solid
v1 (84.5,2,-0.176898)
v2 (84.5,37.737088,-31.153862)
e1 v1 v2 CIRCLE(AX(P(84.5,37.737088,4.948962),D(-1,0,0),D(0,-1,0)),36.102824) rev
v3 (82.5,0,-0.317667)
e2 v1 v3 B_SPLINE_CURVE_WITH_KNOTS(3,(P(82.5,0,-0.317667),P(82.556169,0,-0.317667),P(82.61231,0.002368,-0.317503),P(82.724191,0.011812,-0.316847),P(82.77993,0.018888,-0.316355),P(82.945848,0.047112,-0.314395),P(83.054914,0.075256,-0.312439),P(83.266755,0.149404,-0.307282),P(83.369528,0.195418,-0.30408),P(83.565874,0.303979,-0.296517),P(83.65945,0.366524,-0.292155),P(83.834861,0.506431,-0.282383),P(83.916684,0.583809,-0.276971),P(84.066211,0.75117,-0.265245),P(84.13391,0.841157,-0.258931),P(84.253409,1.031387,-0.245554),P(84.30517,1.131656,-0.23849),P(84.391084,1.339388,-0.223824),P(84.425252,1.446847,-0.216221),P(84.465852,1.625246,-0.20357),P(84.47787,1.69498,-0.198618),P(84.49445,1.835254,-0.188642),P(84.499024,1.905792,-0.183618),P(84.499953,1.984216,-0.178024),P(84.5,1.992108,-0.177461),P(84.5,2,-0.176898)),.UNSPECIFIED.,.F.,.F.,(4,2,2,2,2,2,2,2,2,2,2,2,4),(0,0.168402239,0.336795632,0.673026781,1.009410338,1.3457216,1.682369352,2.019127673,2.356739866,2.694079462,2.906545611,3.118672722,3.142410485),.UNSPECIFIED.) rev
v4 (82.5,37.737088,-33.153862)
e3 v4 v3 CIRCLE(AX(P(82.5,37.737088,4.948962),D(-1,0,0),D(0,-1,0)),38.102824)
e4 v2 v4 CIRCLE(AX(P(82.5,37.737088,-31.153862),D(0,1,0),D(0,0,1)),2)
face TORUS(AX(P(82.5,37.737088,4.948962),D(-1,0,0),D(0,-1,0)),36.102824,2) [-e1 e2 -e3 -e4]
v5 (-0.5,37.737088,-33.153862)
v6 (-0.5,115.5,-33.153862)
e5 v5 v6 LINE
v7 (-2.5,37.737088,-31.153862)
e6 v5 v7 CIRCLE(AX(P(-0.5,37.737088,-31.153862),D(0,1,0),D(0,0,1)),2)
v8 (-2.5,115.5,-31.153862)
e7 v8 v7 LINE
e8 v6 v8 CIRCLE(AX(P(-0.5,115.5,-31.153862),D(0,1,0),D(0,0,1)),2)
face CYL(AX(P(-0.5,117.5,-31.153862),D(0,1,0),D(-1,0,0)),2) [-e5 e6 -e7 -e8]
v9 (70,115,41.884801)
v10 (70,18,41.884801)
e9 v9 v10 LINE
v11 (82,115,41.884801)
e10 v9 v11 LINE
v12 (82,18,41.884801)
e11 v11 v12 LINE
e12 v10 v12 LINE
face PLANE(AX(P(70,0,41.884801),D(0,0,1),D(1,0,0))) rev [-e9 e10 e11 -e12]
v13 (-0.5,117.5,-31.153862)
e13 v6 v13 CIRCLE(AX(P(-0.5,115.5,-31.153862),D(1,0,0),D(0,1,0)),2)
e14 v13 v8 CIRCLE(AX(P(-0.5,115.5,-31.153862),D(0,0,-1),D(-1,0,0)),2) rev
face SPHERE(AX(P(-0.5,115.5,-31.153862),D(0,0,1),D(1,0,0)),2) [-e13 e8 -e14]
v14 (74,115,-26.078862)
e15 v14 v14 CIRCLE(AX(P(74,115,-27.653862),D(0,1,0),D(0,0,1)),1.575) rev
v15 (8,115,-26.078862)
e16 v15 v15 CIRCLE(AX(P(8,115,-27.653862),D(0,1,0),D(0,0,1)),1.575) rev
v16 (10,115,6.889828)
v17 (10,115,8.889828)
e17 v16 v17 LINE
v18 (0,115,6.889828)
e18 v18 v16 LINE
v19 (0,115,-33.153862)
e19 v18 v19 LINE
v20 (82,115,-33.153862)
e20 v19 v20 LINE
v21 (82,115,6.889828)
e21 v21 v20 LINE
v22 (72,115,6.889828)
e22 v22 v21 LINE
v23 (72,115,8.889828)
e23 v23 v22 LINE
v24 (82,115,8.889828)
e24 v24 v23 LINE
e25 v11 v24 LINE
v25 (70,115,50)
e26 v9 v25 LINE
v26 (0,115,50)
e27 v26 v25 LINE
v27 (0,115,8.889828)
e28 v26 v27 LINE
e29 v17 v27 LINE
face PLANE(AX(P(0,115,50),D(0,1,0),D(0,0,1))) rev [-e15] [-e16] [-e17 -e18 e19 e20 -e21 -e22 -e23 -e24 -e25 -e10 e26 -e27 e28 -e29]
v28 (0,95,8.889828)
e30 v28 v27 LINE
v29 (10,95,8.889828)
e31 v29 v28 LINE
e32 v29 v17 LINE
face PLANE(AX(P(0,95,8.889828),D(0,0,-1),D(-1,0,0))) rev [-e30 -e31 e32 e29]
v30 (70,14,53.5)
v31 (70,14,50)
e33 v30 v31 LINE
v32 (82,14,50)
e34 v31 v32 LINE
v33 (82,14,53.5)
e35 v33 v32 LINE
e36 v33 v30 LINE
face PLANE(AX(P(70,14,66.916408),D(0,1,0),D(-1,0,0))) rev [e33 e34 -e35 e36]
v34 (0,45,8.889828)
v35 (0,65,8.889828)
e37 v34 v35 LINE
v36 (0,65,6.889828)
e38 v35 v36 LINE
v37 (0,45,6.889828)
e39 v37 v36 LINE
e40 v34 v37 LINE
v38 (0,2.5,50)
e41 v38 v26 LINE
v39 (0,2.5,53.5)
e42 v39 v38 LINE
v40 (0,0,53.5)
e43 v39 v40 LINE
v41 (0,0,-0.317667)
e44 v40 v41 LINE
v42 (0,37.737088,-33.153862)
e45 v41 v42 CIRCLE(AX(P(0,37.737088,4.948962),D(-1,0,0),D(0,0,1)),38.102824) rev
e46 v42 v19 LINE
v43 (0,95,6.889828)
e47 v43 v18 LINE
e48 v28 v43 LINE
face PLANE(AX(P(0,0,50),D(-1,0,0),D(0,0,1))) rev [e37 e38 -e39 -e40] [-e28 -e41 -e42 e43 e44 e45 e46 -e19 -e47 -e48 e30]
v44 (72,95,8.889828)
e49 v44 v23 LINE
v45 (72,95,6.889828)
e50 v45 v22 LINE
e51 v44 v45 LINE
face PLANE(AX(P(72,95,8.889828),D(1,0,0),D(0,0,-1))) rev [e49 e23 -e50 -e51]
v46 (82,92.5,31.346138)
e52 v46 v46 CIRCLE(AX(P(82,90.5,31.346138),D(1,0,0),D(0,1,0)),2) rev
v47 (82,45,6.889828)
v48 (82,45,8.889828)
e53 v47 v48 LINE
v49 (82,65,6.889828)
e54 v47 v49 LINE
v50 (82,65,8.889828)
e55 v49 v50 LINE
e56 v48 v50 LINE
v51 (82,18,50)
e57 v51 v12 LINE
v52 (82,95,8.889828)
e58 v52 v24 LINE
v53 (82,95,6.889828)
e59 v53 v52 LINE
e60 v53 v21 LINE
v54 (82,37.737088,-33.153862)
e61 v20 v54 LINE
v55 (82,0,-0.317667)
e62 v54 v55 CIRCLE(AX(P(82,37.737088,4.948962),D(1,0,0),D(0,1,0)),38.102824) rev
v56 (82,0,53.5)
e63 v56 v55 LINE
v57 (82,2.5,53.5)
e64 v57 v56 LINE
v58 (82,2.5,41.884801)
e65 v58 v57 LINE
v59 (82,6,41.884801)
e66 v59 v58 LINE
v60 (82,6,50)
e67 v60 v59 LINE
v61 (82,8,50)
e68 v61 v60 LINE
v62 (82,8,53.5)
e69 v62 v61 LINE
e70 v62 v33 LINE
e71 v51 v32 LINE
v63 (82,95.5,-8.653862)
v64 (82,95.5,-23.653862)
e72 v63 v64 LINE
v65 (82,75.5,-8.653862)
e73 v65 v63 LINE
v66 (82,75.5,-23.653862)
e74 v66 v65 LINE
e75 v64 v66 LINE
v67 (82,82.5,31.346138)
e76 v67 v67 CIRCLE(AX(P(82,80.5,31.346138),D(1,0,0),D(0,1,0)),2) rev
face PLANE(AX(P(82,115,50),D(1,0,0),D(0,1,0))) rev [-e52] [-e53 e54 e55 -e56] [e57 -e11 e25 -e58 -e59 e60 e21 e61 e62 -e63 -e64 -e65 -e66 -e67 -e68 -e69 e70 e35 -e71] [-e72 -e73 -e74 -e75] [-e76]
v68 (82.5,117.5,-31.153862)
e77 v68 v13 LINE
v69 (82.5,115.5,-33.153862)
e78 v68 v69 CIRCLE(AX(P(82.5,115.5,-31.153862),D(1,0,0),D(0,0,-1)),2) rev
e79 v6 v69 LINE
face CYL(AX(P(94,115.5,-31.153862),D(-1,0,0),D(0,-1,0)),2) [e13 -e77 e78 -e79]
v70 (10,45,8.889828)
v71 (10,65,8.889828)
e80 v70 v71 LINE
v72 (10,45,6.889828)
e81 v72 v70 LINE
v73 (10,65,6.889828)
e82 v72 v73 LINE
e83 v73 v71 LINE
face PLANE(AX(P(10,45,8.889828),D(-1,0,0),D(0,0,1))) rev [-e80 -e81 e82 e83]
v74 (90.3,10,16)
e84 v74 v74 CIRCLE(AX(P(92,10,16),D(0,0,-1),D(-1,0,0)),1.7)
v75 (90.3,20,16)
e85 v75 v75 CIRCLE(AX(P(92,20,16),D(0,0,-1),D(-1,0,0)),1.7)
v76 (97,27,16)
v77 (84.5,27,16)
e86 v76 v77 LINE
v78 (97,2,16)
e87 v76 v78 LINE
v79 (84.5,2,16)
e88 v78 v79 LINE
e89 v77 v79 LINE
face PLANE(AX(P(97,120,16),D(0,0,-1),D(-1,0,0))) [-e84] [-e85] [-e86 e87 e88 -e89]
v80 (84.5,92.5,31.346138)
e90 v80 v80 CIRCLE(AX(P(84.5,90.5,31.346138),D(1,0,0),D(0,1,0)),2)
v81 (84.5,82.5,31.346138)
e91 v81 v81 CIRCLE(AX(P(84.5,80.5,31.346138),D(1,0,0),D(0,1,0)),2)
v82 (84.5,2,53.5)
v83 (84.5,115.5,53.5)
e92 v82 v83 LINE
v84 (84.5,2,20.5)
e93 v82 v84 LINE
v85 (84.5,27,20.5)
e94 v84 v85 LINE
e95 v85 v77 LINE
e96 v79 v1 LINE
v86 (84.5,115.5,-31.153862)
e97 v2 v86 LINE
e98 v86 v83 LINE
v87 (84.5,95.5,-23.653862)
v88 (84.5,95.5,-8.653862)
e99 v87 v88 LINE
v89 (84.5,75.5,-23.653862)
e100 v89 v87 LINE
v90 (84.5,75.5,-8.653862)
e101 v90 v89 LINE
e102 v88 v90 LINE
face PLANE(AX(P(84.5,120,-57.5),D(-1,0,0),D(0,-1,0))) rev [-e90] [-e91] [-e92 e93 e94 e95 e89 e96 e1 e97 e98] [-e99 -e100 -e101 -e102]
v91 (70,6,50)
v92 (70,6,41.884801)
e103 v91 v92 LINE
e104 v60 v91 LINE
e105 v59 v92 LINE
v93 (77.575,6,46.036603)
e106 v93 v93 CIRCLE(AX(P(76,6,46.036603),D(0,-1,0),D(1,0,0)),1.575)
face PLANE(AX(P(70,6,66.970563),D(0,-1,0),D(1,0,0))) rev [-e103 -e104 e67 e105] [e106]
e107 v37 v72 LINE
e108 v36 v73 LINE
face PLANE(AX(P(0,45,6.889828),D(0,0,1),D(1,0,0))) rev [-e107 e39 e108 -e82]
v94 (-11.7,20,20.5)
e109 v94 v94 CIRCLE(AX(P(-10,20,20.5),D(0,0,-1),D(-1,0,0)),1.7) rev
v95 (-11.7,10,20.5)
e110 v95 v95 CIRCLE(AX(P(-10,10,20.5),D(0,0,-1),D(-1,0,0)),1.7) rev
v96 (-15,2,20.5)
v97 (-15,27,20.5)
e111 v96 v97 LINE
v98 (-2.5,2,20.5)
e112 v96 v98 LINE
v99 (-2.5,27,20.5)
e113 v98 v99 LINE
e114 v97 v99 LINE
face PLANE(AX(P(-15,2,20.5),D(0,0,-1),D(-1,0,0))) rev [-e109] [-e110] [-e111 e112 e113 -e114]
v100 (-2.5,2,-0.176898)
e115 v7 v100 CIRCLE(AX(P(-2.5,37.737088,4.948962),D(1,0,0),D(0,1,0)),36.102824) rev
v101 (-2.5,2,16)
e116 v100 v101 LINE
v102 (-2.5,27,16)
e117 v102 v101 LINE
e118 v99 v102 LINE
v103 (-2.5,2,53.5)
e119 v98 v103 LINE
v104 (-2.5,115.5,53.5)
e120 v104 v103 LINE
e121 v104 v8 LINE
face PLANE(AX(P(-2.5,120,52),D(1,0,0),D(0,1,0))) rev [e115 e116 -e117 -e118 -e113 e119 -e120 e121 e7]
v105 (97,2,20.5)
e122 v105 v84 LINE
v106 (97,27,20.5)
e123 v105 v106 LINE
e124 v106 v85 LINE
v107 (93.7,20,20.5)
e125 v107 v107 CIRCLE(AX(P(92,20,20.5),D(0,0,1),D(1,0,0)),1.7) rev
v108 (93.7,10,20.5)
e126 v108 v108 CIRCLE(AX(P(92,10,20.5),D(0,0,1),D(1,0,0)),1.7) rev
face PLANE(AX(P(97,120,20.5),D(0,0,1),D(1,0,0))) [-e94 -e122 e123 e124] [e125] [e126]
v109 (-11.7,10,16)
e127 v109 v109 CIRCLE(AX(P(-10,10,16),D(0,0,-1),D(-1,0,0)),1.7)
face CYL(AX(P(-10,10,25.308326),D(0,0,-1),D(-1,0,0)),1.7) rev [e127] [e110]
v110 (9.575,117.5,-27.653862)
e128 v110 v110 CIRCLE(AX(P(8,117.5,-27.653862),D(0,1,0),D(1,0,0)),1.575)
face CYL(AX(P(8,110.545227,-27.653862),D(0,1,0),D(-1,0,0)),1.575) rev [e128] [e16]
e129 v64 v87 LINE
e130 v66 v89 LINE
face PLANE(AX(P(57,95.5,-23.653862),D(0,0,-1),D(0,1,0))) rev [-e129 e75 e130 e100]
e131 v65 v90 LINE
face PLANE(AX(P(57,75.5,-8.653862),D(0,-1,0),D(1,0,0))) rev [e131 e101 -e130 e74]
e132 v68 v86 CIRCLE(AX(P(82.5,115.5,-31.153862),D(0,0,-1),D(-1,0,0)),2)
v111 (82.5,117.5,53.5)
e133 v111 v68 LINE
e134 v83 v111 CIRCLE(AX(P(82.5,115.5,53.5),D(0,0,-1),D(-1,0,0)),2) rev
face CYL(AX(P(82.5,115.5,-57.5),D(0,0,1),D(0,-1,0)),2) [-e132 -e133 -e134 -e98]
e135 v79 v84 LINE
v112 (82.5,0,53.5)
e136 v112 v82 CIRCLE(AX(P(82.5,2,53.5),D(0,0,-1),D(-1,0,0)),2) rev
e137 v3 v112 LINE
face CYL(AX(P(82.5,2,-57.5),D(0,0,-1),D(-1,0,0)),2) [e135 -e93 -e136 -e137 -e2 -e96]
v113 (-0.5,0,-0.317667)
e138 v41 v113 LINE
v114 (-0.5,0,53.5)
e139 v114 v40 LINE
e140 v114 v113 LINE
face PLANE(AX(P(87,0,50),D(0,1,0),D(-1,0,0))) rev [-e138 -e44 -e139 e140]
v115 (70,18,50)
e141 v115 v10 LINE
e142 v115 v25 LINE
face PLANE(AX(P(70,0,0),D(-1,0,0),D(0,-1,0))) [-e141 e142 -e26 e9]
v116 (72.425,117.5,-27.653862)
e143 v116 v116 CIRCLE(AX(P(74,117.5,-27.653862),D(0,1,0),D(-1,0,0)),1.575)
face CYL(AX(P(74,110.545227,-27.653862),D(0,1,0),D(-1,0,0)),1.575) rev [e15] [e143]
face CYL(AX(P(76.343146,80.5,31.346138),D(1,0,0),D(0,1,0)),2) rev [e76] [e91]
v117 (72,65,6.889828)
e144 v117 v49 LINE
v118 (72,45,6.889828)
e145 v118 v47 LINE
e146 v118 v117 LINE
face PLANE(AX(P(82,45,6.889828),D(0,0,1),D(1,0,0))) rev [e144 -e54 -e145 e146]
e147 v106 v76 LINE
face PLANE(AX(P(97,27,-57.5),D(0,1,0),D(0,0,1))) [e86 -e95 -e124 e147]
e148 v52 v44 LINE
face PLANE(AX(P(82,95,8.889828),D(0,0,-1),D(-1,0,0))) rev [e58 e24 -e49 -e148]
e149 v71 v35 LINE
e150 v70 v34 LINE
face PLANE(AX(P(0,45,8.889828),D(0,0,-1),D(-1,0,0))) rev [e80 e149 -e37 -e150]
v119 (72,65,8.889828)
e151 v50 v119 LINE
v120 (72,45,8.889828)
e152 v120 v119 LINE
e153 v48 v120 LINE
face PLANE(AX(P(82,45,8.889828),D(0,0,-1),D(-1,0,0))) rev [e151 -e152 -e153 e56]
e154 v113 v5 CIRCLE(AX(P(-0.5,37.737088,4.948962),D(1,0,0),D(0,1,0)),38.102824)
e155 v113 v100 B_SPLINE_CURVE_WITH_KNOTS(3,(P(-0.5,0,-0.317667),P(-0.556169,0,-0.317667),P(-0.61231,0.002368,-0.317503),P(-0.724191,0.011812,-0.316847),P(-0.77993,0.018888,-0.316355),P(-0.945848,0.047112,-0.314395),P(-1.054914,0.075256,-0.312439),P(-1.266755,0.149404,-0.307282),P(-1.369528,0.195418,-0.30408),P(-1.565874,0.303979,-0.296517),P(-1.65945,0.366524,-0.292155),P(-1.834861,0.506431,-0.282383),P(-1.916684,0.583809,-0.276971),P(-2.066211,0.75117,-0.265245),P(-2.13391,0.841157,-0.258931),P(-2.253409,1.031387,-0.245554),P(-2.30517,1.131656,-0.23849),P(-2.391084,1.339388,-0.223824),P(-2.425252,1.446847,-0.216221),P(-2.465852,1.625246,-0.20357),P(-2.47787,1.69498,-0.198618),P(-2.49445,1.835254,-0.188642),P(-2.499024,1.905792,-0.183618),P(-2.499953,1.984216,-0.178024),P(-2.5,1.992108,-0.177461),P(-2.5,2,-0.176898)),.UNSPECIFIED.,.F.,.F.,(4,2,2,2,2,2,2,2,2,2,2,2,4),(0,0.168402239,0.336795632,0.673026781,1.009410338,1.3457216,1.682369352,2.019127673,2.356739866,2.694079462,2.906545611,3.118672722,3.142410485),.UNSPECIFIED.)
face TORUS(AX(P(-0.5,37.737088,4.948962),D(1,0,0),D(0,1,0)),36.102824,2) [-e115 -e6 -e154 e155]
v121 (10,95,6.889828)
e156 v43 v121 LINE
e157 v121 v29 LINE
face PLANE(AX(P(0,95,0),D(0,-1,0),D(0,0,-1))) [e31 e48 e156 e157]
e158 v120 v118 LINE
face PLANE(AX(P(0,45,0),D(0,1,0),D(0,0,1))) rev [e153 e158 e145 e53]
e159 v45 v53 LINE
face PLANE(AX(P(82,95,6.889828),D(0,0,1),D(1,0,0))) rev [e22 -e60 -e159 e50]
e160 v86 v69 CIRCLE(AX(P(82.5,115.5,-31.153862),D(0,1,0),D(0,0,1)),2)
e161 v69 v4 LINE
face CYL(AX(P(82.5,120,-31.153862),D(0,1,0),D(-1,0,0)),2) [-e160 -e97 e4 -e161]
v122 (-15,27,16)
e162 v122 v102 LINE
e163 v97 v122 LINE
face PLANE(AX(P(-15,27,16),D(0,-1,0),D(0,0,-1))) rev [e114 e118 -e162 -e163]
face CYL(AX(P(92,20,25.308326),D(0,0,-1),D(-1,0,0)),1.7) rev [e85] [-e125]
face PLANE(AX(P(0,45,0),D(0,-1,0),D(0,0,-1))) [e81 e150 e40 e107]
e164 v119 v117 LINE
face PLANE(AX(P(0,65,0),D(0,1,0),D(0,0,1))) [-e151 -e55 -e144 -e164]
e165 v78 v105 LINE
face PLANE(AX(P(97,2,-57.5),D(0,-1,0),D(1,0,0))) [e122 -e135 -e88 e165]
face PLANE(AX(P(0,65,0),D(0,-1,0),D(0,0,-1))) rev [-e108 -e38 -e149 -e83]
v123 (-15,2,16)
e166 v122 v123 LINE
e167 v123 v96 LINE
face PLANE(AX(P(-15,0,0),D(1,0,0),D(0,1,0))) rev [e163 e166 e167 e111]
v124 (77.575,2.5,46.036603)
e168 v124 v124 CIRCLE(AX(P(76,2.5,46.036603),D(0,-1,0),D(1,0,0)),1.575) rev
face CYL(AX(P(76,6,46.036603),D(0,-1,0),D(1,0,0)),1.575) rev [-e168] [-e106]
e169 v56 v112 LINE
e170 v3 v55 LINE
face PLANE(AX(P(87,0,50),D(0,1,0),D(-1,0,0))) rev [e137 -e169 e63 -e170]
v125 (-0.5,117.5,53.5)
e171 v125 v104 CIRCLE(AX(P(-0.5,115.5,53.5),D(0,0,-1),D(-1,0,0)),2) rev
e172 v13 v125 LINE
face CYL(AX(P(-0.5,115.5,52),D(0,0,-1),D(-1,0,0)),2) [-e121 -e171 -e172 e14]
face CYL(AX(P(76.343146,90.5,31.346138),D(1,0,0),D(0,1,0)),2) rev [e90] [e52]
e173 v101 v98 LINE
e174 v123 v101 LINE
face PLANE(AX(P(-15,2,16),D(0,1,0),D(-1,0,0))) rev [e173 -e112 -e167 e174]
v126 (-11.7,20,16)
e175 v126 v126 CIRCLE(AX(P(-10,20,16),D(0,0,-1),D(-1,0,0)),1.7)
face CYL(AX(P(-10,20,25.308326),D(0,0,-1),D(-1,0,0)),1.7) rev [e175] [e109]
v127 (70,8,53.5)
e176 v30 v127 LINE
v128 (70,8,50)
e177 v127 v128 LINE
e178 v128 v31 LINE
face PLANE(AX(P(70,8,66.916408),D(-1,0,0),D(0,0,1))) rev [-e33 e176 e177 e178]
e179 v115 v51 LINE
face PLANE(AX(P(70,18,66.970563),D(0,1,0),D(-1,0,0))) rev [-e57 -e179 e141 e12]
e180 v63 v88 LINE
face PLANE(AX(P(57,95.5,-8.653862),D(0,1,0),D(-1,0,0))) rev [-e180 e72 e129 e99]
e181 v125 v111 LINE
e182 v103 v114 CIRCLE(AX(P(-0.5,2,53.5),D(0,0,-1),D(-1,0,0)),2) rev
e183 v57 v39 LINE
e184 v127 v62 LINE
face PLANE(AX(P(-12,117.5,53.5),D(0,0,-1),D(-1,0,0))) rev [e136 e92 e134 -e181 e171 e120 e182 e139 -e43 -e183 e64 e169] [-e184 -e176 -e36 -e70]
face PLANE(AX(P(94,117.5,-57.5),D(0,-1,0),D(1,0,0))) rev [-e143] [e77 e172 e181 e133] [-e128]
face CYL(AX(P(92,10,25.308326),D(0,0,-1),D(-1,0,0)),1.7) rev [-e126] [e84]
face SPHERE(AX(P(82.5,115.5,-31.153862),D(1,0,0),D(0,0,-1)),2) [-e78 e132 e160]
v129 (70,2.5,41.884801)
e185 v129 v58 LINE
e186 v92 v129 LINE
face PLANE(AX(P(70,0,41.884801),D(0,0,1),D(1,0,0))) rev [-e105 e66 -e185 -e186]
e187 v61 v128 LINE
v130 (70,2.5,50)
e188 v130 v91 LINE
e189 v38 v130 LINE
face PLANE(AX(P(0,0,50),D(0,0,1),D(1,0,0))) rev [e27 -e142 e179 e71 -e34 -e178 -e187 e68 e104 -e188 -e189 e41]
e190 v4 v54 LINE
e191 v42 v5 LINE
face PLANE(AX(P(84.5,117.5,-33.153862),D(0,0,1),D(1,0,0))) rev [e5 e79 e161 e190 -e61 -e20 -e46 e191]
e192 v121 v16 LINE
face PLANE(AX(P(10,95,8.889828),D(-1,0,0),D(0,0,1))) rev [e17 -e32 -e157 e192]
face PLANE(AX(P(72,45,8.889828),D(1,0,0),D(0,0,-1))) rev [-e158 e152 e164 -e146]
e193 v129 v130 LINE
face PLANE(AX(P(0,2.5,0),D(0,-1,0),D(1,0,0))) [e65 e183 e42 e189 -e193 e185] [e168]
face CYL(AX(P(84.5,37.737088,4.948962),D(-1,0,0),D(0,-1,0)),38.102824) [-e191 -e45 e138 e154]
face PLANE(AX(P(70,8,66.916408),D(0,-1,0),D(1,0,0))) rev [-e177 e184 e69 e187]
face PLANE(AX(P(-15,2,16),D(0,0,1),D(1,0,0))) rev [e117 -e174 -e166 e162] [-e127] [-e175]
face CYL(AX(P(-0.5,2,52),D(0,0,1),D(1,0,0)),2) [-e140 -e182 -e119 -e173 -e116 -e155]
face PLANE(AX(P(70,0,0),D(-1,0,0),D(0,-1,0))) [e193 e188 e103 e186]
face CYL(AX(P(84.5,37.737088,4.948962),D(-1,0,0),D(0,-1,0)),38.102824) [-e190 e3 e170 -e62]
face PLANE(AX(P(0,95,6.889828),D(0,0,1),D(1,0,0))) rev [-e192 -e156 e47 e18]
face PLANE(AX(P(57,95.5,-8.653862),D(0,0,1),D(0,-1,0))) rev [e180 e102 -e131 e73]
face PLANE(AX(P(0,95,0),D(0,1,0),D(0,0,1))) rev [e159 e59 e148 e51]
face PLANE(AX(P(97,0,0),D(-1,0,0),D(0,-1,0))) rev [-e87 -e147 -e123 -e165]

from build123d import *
from build123d.topology import SkipClean

# Parameters (mm, degrees)
BOSS_EXTRUDE1_DEPTH     = 50
SKETCH3_W               = 92
SKETCH3_H               = 120
BOSS_EXTRUDE2_DEPTH     = 5
SKETCH4_W               = 8.115199035
SKETCH4_H               = 120
BOSS_EXTRUDE3_DEPTH     = 12
BOSS_EXTRUDE4_DEPTH     = 60
SKETCH5_W               = 10
SKETCH5_H               = 2
BOSS_EXTRUDE5_DEPTH     = 20
BOSS_EXTRUDE6_START     = 50
SKETCH5_2_W             = 10
SKETCH5_2_H             = 2
BOSS_EXTRUDE6_DEPTH     = 20
SKETCH6_W               = 92
SKETCH6_H               = 120
BOSS_EXTRUDE7_DEPTH     = 5
SKETCH7_W               = 7
SKETCH7_H               = 10
SKETCH7_R               = 1.6
BOSS_EXTRUDE8_DEPTH     = 3
CUT_EXTRUDE2_DEPTH      = 164.816971038
CUT_EXTRUDE4_DEPTH      = 165.373051319
CUT_EXTRUDE4_DEPTH_BACK = 165.373051319
SKETCH12_W              = 112.5
SKETCH12_H              = 2.5
SKETCH14_W              = 106
SKETCH14_H              = 1.5
CUT_EXTRUDE5_DEPTH      = 162.085381087
SKETCH15_R              = 1.6
BOSS_EXTRUDE10_DEPTH    = 2
SKETCH16_W              = 87
SKETCH16_H              = 3.364665628
CUT_EXTRUDE6_DEPTH      = 162.085381087
SKETCH17_W              = 10
SKETCH17_H              = 2
CUT_EXTRUDE7_DEPTH      = 70
SKETCH19_W              = 7
SKETCH19_H              = 10
SKETCH19_R              = 1.6
BOSS_EXTRUDE11_DEPTH    = 3.5
SKETCH21_W              = 7
SKETCH21_H              = 10
SKETCH21_R              = 1.6
BOSS_EXTRUDE13_DEPTH    = 3.5
SKETCH22_W              = 9.5
SKETCH22_H              = 117.5
CUT_EXTRUDE8_DEPTH      = 186.007067988
CUT_EXTRUDE9_DEPTH      = 156.903445849
SKETCH26_W              = 12
SKETCH26_H              = 12
CUT_EXTRUDE10_DEPTH     = 8.115199035
SKETCH27_R              = 1.575
CUT_EXTRUDE11_DEPTH     = 6
SKETCH28_W              = 82
SKETCH28_H              = 11.615199035
CUT_EXTRUDE12_DEPTH     = 2.5
SKETCH30_R              = 1.575
CUT_EXTRUDE13_DEPTH     = 2.5
SKETCH31_W              = 12
SKETCH31_H              = 6
CUT_EXTRUDE14_DEPTH     = 3.5
FILLET1_R               = 2
FILLET2_R               = 2
SKETCH32_W              = 15
SKETCH32_H              = 20
CUT_EXTRUDE15_DEPTH     = 2.5
SKETCH33_R              = 2
CUT_EXTRUDE16_DEPTH     = 2.5
SKETCH37_W              = 4.5
SKETCH37_H              = 25
BOSS_EXTRUDE17_DEPTH    = 12.5
BOSS_EXTRUDE18_START    = -87
SKETCH37_2_W            = 4.5
SKETCH37_2_H            = 25
BOSS_EXTRUDE18_DEPTH    = 12.5
SKETCH39_R              = 1.7
CUT_EXTRUDE17_DEPTH     = 4.5
SKETCH40_R              = 1.7
CUT_EXTRUDE18_DEPTH     = 4.5


with BuildPart() as part:
    # Sketch2 → Boss-Extrude1 (new body)
    with BuildSketch(Plane.XY):
        Polygon((0, 0), (0, 115), (82, 115), (82, 0), (87, 0), (87, 120), (-5, 120), (-5, 0), align=None)
    extrude(amount=BOSS_EXTRUDE1_DEPTH)

    # Sketch3 → Boss-Extrude2 (add)
    with BuildSketch(Plane.XY.offset(50)):
        with Locations((41, 60)):
            Rectangle(SKETCH3_W, SKETCH3_H)
    extrude(amount=BOSS_EXTRUDE2_DEPTH)

    # Sketch4 → Boss-Extrude3 (add)
    with BuildSketch(Plane.ZY.offset(-82)):
        with Locations((45.942400483, 60)):
            Rectangle(SKETCH4_W, SKETCH4_H)
    extrude(amount=BOSS_EXTRUDE3_DEPTH)

    # Sketch2<2> → Boss-Extrude4 (add)
    with BuildSketch(Plane.XY):
        Polygon((0, 0), (0, 115), (82, 115), (82, 0), (87, 0), (87, 120), (-5, 120), (-5, 0), align=None)
    extrude(amount=-BOSS_EXTRUDE4_DEPTH)

    # Sketch5 → Boss-Extrude5 (add)
    with BuildSketch(Plane.XZ.offset(-115)):
        with Locations((5, 7.889828052)):
            Rectangle(SKETCH5_W, SKETCH5_H)
        with Locations((5, 2.689828052)):
            Rectangle(SKETCH5_W, SKETCH5_H)
        with Locations((77, 2.689828052)):
            Rectangle(SKETCH5_W, SKETCH5_H)
        with Locations((77, 7.889828052)):
            Rectangle(SKETCH5_W, SKETCH5_H)
    extrude(amount=BOSS_EXTRUDE5_DEPTH)

    # Sketch5<2> → Boss-Extrude6 (add)
    with BuildSketch(Plane.XZ.offset(-115).offset(BOSS_EXTRUDE6_START)):
        with Locations((5, 7.889828052)):
            Rectangle(SKETCH5_2_W, SKETCH5_2_H)
        with Locations((5, 2.689828052)):
            Rectangle(SKETCH5_2_W, SKETCH5_2_H)
        with Locations((77, 2.689828052)):
            Rectangle(SKETCH5_2_W, SKETCH5_2_H)
        with Locations((77, 7.889828052)):
            Rectangle(SKETCH5_2_W, SKETCH5_2_H)
    extrude(amount=BOSS_EXTRUDE6_DEPTH)

    # Sketch6 → Boss-Extrude7 (add)
    with BuildSketch(Plane(origin=(0, 0, -60), x_dir=(-1, 0, 0), z_dir=(0, 0, -1))):
        with Locations((-41, 60)):
            Rectangle(SKETCH6_W, SKETCH6_H)
    extrude(amount=-BOSS_EXTRUDE7_DEPTH)

    # Sketch7 → Boss-Extrude8 (add)
    # profile 1 of 4: a face of its own
    with BuildSketch(Plane.XY.offset(55)):
        with Locations((90.5, 115)):
            Rectangle(SKETCH7_W, SKETCH7_H)
        with Locations((90.472155735, 113.006992181)):
            Circle(SKETCH7_R, mode=Mode.SUBTRACT)
    # profile 2 of 4: a face of its own
    with BuildSketch(Plane.XY.offset(55)):
        with Locations((-8.5, 115)):
            Rectangle(SKETCH7_W, SKETCH7_H)
        with Locations(Location((-8.472155735, 113.006992181, 0), (0, 0, 180))):
            Circle(SKETCH7_R, mode=Mode.SUBTRACT)
    # profile 3 of 4: a face of its own
    with BuildSketch(Plane.XY.offset(55)):
        with Locations((-8.5, 5)):
            Rectangle(SKETCH7_W, SKETCH7_H)
        with Locations((-8.472155735, 6.993007819)):
            Circle(SKETCH7_R, mode=Mode.SUBTRACT)
    # profile 4 of 4: a face of its own
    with BuildSketch(Plane.XY.offset(55)):
        with Locations((90.5, 5)):
            Rectangle(SKETCH7_W, SKETCH7_H)
        with Locations(Location((90.472155735, 6.993007819, 0), (0, 0, 180))):
            Circle(SKETCH7_R, mode=Mode.SUBTRACT)
    extrude(amount=-BOSS_EXTRUDE8_DEPTH)

    # Sketch11 → Cut-Extrude2 (cut, through all)
    with BuildSketch(Plane.XZ):
        Polygon((-5, 52), (-2.5, 52), (-2.5, -57.5), (84.5, -57.5), (84.5, 52), (87, 52), (87, -60), (-5, -60), align=None)
    extrude(amount=-CUT_EXTRUDE2_DEPTH, mode=Mode.SUBTRACT)

    # Sketch12 → Cut-Extrude4 (cut, two sides: drawn at the far end of the back side and taken through both)
    with BuildSketch(Plane.ZY.offset(2.5).offset(-CUT_EXTRUDE4_DEPTH_BACK)):
        with Locations((-1.25, 118.75)):
            Rectangle(SKETCH12_W, SKETCH12_H)
    extrude(amount=CUT_EXTRUDE4_DEPTH + CUT_EXTRUDE4_DEPTH_BACK, mode=Mode.SUBTRACT)

    # Sketch14 → Cut-Extrude5 (cut, through all)
    with BuildSketch(Plane.XZ):
        with Locations((41, 54.25)):
            Rectangle(SKETCH14_W, SKETCH14_H)
    extrude(amount=-CUT_EXTRUDE5_DEPTH, mode=Mode.SUBTRACT)

    # Sketch15 → Boss-Extrude10 (add)
    # profile 1 of 2: a face of its own
    with SkipClean():  # the faces are left unmerged after this step: merging them gives an invalid solid
        with BuildSketch(Plane(origin=(0, 0, 52), x_dir=(-1, 0, 0), z_dir=(0, 0, -1))):
            Polygon((-84.5, 117.5), (-94, 117.5), (-94, 110), (-87, 110), (-87, 10), (-94, 10), (-94, 0), (-84.5, 0), align=None)
            with Locations((-90.472155735, 113.006992181)):
                Circle(SKETCH15_R, mode=Mode.SUBTRACT)
            with Locations((-90.472155735, 6.993007819)):
                Circle(SKETCH15_R, mode=Mode.SUBTRACT)
        # profile 2 of 2: a face of its own
        with BuildSketch(Plane(origin=(0, 0, 52), x_dir=(-1, 0, 0), z_dir=(0, 0, -1))):
            Polygon((2.5, 0), (2.5, 117.5), (12, 117.5), (12, 110), (5, 110), (5, 10), (12, 10), (12, 0), align=None)
            with Locations(Location((8.472155735, 113.006992181, 0), (0, 0, 180))):
                Circle(SKETCH15_R, mode=Mode.SUBTRACT)
            with Locations(Location((8.472155735, 6.993007819, 0), (0, 0, 180))):
                Circle(SKETCH15_R, mode=Mode.SUBTRACT)
        extrude(amount=BOSS_EXTRUDE10_DEPTH)

    # Sketch16 → Cut-Extrude6 (cut, through all)
    with SkipClean():  # the faces are left unmerged after this step: merging them gives an invalid solid
        with BuildSketch(Plane.XZ):
            with Locations((41, -55.817667186)):
                Rectangle(SKETCH16_W, SKETCH16_H)
        extrude(amount=-CUT_EXTRUDE6_DEPTH, mode=Mode.SUBTRACT)

    # Sketch17 → Cut-Extrude7 (cut)
    with SkipClean():  # the faces are left unmerged after this step: merging them gives an invalid solid
        with BuildSketch(Plane.XZ.offset(-45)):
            with Locations((5, 2.689828052)):
                Rectangle(SKETCH17_W, SKETCH17_H)
            with Locations((77, 2.689828052)):
                Rectangle(SKETCH17_W, SKETCH17_H)
        extrude(amount=-CUT_EXTRUDE7_DEPTH, mode=Mode.SUBTRACT)

    # Sketch19 → Boss-Extrude11 (add)
    # profile 1 of 4: a face of its own
    with SkipClean():  # the faces are left unmerged after this step: merging them gives an invalid solid
        with BuildSketch(Plane.XZ):
            with Locations((88, -49.135334372)):
                Rectangle(SKETCH19_W, SKETCH19_H)
            with Locations((87.901562489, -49.234834013)):
                Circle(SKETCH19_R, mode=Mode.SUBTRACT)
        # profile 2 of 4: a face of its own
        with BuildSketch(Plane.XZ):
            with Locations((-6, -49.135334372)):
                Rectangle(SKETCH19_W, SKETCH19_H)
            with Locations(Location((-5.901562489, -49.234834013, 0), (0, 0, 180))):
                Circle(SKETCH19_R, mode=Mode.SUBTRACT)
        # profile 3 of 4: a face of its own
        with BuildSketch(Plane.XZ):
            with Locations((-6, 34.080676656)):
                Rectangle(SKETCH19_W, SKETCH19_H)
            with Locations((-5.901562489, 34.180176298)):
                Circle(SKETCH19_R, mode=Mode.SUBTRACT)
        # profile 4 of 4: a face of its own
        with BuildSketch(Plane.XZ):
            with Locations((88, 34.080676656)):
                Rectangle(SKETCH19_W, SKETCH19_H)
            with Locations(Location((87.901562489, 34.180176298, 0), (0, 0, 180))):
                Circle(SKETCH19_R, mode=Mode.SUBTRACT)
        extrude(amount=-BOSS_EXTRUDE11_DEPTH)

    # Sketch21 → Boss-Extrude13 (add)
    # profile 1 of 4: a face of its own
    with SkipClean():  # the faces are left unmerged after this step: merging them gives an invalid solid
        with BuildSketch(Plane(origin=(0, 0, -54.135334372), x_dir=(-1, 0, 0), z_dir=(0, 0, -1))):
            with Locations((-88, 112.5)):
                Rectangle(SKETCH21_W, SKETCH21_H)
            with Locations((-87.460864154, 112.996655596)):
                Circle(SKETCH21_R, mode=Mode.SUBTRACT)
        # profile 2 of 4: a face of its own
        with BuildSketch(Plane(origin=(0, 0, -54.135334372), x_dir=(-1, 0, 0), z_dir=(0, 0, -1))):
            with Locations((6, 112.5)):
                Rectangle(SKETCH21_W, SKETCH21_H)
            with Locations(Location((5.460864154, 112.996655596, 0), (0, 0, 180))):
                Circle(SKETCH21_R, mode=Mode.SUBTRACT)
        # profile 3 of 4: a face of its own
        with BuildSketch(Plane(origin=(0, 0, -54.135334372), x_dir=(-1, 0, 0), z_dir=(0, 0, -1))):
            with Locations((6, 17.859776919)):
                Rectangle(SKETCH21_W, SKETCH21_H)
            with Locations((5.460864154, 17.363121322)):
                Circle(SKETCH21_R, mode=Mode.SUBTRACT)
        # profile 4 of 4: a face of its own
        with BuildSketch(Plane(origin=(0, 0, -54.135334372), x_dir=(-1, 0, 0), z_dir=(0, 0, -1))):
            with Locations((-88, 17.859776919)):
                Rectangle(SKETCH21_W, SKETCH21_H)
            with Locations(Location((-87.460864154, 17.363121322, 0), (0, 0, 180))):
                Circle(SKETCH21_R, mode=Mode.SUBTRACT)
        extrude(amount=-BOSS_EXTRUDE13_DEPTH)

    # Sketch22 → Cut-Extrude8 (cut, through all)
    with BuildSketch(Plane(origin=(0, 0, -54.135334372), x_dir=(-1, 0, 0), z_dir=(0, 0, -1))):
        with Locations((7.25, 58.75)):
            Rectangle(SKETCH22_W, SKETCH22_H)
        with Locations((-89.25, 58.75)):
            Rectangle(SKETCH22_W, SKETCH22_H)
    extrude(amount=-CUT_EXTRUDE8_DEPTH, mode=Mode.SUBTRACT)

    # Sketch24 → Cut-Extrude9 (cut, through all)
    with BuildSketch(Plane.ZY.offset(2.5)):
        with BuildLine():
            Line((-33.153862192, 117.5), (-33.153862192, 37.737088179))
            ThreePointArc((-33.153862192, 37.737088179), (-23.795591024, 12.725573197), (-0.317667186, 0))
            Line((-0.317667186, 0), (-54.135334372, 0))
            Line((-54.135334372, 0), (-54.135334372, 117.5))
            Line((-54.135334372, 117.5), (-33.153862192, 117.5))
        make_face()
    extrude(amount=-CUT_EXTRUDE9_DEPTH, mode=Mode.SUBTRACT)

    # Sketch26 → Cut-Extrude10 (cut)
    with BuildSketch(Plane(origin=(0, 0, 41.884800965), x_dir=(-1, 0, 0), z_dir=(0, 0, -1))):
        with Locations((-76, 12)):
            Rectangle(SKETCH26_W, SKETCH26_H)
    extrude(amount=-CUT_EXTRUDE10_DEPTH, mode=Mode.SUBTRACT)

    # Sketch27 → Cut-Extrude11 (cut)
    with BuildSketch(Plane.XZ):
        with Locations((76, 46.036602525)):
            Circle(SKETCH27_R)
    extrude(amount=-CUT_EXTRUDE11_DEPTH, mode=Mode.SUBTRACT)

    # Sketch28 → Cut-Extrude12 (cut)
    with BuildSketch(Plane.XZ):
        with Locations((41, 47.692400483)):
            Rectangle(SKETCH28_W, SKETCH28_H)
    extrude(amount=-CUT_EXTRUDE12_DEPTH, mode=Mode.SUBTRACT)

    # Sketch30 → Cut-Extrude13 (cut)
    with BuildSketch(Plane(origin=(0, 117.5, 0), x_dir=(1, 0, 0), z_dir=(0, 1, 0))):
        with Locations(Location((74, 27.653862192, 0), (0, 0, 180))):
            Circle(SKETCH30_R)
        with Locations(Location((8, 27.653862192, 0), (0, 0, 270))):
            Circle(SKETCH30_R)
    extrude(amount=-CUT_EXTRUDE13_DEPTH, mode=Mode.SUBTRACT)

    # Sketch31 → Cut-Extrude14 (cut)
    with BuildSketch(Plane(origin=(0, 0, 50), x_dir=(-1, 0, 0), z_dir=(0, 0, -1))):
        with Locations((-76, 11)):
            Rectangle(SKETCH31_W, SKETCH31_H)
    extrude(amount=-CUT_EXTRUDE14_DEPTH, mode=Mode.SUBTRACT)

    # Fillet1
    fillet1_edges = [part.edges().sort_by_distance(p)[0] for p in [
        (-2.5, 117.5, 10.173068904),
    ]]
    fillet(fillet1_edges, radius=FILLET1_R)

    # Fillet2
    # the kernel refuses this fillet: 2 mm, written as the material it takes off along each edge
    with BuildSketch(Plane(origin=(82.5, 115.5, -31.153862192), x_dir=(1, 0, 0), z_dir=(0, 1, 0))) as fillet2_piece_1_section:
        Polygon((0, 0), (FILLET2_R, 0), (FILLET2_R, FILLET2_R), (0, FILLET2_R), align=None)
    fillet2_piece_1 = extrude(amount=FILLET2_R, mode=Mode.PRIVATE)
    fillet2_piece_1 = fillet2_piece_1 - Plane(origin=(82.5, 115.5, -31.153862192), x_dir=(-0.7071067811865477, 0, 0.7071067811865475), z_dir=(0, 1, 0)) * Sphere(FILLET2_R, mode=Mode.PRIVATE)
    add(fillet2_piece_1, mode=Mode.SUBTRACT)
    with BuildSketch(Plane(origin=(-0.5, 115.5, -33.153862192), x_dir=(-1, 0, 0), z_dir=(0, -1, 0))) as fillet2_piece_2:
        with BuildLine():
            CenterArc((2 - FILLET2_R, -FILLET2_R), FILLET2_R, 0, 90)
            Line((2 - FILLET2_R, 0), (2, 0))
            Line((2, 0), (2, -FILLET2_R))
        make_face()
    revolve(axis=Axis((-0.5, 115.5, -33.153862192), (0, 0, -1)), revolution_arc=90, mode=Mode.SUBTRACT)
    with BuildSketch(Plane(origin=(84.5, 0, -5.317667186), x_dir=(0, 1, 0), z_dir=(0, 0, 1)), Plane(origin=(-2.5, 0, 58.5), x_dir=(0, 1, 0), z_dir=(0, 0, -1))) as fillet2_piece_3:
        with BuildLine():
            CenterArc((FILLET2_R, FILLET2_R), FILLET2_R, 180, 90)
            Line((0, FILLET2_R), (0, 0))
            Line((0, 0), (FILLET2_R, 0))
        make_face()
    extrude(amount=63.817667186, mode=Mode.SUBTRACT)
    with BuildSketch(Plane(origin=(84.5, 117.5, -31.153862192), x_dir=(-1, 0, 0), z_dir=(0, 0, 1))) as fillet2_piece_4:
        with BuildLine():
            CenterArc((FILLET2_R, FILLET2_R), FILLET2_R, 180, 90)
            Line((0, FILLET2_R), (0, 0))
            Line((0, 0), (FILLET2_R, 0))
        make_face()
    extrude(amount=89.653862192, mode=Mode.SUBTRACT)
    with BuildSketch(Plane(origin=(84.5, 37.737088179, 4.948961936), x_dir=(0, 0, -1), z_dir=(0, 1, 0))) as fillet2_piece_5:
        with BuildLine():
            CenterArc((38.102824128 - FILLET2_R, FILLET2_R), FILLET2_R, 270, 90)
            Line((38.102824128, FILLET2_R), (38.102824128, 0))
            Line((38.102824128, 0), (38.102824128 - FILLET2_R, 0))
        make_face()
    revolve(axis=Axis((84.5, 37.737088179, 4.948961936), (-1, 0, 0)), revolution_arc=89.576139728, mode=Mode.SUBTRACT)
    with BuildSketch(Plane(origin=(84.5, 37.737088179, -33.153862192), x_dir=(0, 0, 1), z_dir=(0, 1, 0)), Plane(origin=(-2.5, 115.5, -33.153862192), x_dir=(0, 0, 1), z_dir=(0, -1, 0))) as fillet2_piece_6:
        with BuildLine():
            CenterArc((FILLET2_R, -FILLET2_R), FILLET2_R, 90, 90)
            Line((0, -FILLET2_R), (0, 0))
            Line((0, 0), (FILLET2_R, 0))
        make_face()
    extrude(amount=77.762911821, mode=Mode.SUBTRACT)
    with BuildSketch(Plane(origin=(-0.5, 117.5, -33.153862192), x_dir=(0, 0, 1), z_dir=(1, 0, 0))) as fillet2_piece_7:
        with BuildLine():
            CenterArc((FILLET2_R, FILLET2_R), FILLET2_R, 180, 90)
            Line((0, FILLET2_R), (0, 0))
            Line((0, 0), (FILLET2_R, 0))
        make_face()
    extrude(amount=83, mode=Mode.SUBTRACT)
    with BuildSketch(Plane(origin=(-2.5, 37.737088179, 4.948961936), x_dir=(0, 0, -1), z_dir=(0, 1, 0))) as fillet2_piece_8:
        with BuildLine():
            CenterArc((38.102824128 - FILLET2_R, -FILLET2_R), FILLET2_R, 0, 90)
            Line((38.102824128, -FILLET2_R), (38.102824128, 0))
            Line((38.102824128, 0), (38.102824128 - FILLET2_R, 0))
        make_face()
    revolve(axis=Axis((-2.5, 37.737088179, 4.948961936), (-1, 0, 0)), revolution_arc=89.576139728, mode=Mode.SUBTRACT)

    # Sketch32 → Cut-Extrude15 (cut)
    with BuildSketch(Plane(origin=(84.5, 0, 0), x_dir=(0, 0, -1), z_dir=(1, 0, 0))):
        with Locations((16.153862192, 85.5)):
            Rectangle(SKETCH32_W, SKETCH32_H)
    extrude(amount=-CUT_EXTRUDE15_DEPTH, mode=Mode.SUBTRACT)

    # Sketch33 → Cut-Extrude16 (cut)
    with BuildSketch(Plane(origin=(84.5, 0, 0), x_dir=(0, 0, -1), z_dir=(1, 0, 0))):
        with Locations(Location((-31.346137808, 90.5, 0), (0, 0, 90))):
            Circle(SKETCH33_R)
        with Locations(Location((-31.346137808, 80.5, 0), (0, 0, 90))):
            Circle(SKETCH33_R)
    extrude(amount=-CUT_EXTRUDE16_DEPTH, mode=Mode.SUBTRACT)

    # Sketch37 → Boss-Extrude17 (add)
    with BuildSketch(Plane.ZY.offset(2.5)):
        with Locations((18.25, 14.5)):
            Rectangle(SKETCH37_W, SKETCH37_H)
    extrude(amount=BOSS_EXTRUDE17_DEPTH)

    # Sketch37<2> → Boss-Extrude18 (add)
    with BuildSketch(Plane.ZY.offset(2.5).offset(BOSS_EXTRUDE18_START)):
        with Locations((18.25, 14.5)):
            Rectangle(SKETCH37_2_W, SKETCH37_2_H)
    extrude(amount=-BOSS_EXTRUDE18_DEPTH)

    # Sketch39 → Cut-Extrude17 (cut)
    with BuildSketch(Plane(origin=(0, 0, 16), x_dir=(-1, 0, 0), z_dir=(0, 0, -1))):
        with Locations((10, 10)):
            Circle(SKETCH39_R)
        with Locations((10, 20)):
            Circle(SKETCH39_R)
    extrude(amount=-CUT_EXTRUDE17_DEPTH, mode=Mode.SUBTRACT)

    # Sketch40 → Cut-Extrude18 (cut)
    with BuildSketch(Plane(origin=(0, 0, 16), x_dir=(-1, 0, 0), z_dir=(0, 0, -1))):
        with Locations((-92, 10)):
            Circle(SKETCH40_R)
        with Locations((-92, 20)):
            Circle(SKETCH40_R)
    extrude(amount=-CUT_EXTRUDE18_DEPTH, mode=Mode.SUBTRACT)


solid = part.part
